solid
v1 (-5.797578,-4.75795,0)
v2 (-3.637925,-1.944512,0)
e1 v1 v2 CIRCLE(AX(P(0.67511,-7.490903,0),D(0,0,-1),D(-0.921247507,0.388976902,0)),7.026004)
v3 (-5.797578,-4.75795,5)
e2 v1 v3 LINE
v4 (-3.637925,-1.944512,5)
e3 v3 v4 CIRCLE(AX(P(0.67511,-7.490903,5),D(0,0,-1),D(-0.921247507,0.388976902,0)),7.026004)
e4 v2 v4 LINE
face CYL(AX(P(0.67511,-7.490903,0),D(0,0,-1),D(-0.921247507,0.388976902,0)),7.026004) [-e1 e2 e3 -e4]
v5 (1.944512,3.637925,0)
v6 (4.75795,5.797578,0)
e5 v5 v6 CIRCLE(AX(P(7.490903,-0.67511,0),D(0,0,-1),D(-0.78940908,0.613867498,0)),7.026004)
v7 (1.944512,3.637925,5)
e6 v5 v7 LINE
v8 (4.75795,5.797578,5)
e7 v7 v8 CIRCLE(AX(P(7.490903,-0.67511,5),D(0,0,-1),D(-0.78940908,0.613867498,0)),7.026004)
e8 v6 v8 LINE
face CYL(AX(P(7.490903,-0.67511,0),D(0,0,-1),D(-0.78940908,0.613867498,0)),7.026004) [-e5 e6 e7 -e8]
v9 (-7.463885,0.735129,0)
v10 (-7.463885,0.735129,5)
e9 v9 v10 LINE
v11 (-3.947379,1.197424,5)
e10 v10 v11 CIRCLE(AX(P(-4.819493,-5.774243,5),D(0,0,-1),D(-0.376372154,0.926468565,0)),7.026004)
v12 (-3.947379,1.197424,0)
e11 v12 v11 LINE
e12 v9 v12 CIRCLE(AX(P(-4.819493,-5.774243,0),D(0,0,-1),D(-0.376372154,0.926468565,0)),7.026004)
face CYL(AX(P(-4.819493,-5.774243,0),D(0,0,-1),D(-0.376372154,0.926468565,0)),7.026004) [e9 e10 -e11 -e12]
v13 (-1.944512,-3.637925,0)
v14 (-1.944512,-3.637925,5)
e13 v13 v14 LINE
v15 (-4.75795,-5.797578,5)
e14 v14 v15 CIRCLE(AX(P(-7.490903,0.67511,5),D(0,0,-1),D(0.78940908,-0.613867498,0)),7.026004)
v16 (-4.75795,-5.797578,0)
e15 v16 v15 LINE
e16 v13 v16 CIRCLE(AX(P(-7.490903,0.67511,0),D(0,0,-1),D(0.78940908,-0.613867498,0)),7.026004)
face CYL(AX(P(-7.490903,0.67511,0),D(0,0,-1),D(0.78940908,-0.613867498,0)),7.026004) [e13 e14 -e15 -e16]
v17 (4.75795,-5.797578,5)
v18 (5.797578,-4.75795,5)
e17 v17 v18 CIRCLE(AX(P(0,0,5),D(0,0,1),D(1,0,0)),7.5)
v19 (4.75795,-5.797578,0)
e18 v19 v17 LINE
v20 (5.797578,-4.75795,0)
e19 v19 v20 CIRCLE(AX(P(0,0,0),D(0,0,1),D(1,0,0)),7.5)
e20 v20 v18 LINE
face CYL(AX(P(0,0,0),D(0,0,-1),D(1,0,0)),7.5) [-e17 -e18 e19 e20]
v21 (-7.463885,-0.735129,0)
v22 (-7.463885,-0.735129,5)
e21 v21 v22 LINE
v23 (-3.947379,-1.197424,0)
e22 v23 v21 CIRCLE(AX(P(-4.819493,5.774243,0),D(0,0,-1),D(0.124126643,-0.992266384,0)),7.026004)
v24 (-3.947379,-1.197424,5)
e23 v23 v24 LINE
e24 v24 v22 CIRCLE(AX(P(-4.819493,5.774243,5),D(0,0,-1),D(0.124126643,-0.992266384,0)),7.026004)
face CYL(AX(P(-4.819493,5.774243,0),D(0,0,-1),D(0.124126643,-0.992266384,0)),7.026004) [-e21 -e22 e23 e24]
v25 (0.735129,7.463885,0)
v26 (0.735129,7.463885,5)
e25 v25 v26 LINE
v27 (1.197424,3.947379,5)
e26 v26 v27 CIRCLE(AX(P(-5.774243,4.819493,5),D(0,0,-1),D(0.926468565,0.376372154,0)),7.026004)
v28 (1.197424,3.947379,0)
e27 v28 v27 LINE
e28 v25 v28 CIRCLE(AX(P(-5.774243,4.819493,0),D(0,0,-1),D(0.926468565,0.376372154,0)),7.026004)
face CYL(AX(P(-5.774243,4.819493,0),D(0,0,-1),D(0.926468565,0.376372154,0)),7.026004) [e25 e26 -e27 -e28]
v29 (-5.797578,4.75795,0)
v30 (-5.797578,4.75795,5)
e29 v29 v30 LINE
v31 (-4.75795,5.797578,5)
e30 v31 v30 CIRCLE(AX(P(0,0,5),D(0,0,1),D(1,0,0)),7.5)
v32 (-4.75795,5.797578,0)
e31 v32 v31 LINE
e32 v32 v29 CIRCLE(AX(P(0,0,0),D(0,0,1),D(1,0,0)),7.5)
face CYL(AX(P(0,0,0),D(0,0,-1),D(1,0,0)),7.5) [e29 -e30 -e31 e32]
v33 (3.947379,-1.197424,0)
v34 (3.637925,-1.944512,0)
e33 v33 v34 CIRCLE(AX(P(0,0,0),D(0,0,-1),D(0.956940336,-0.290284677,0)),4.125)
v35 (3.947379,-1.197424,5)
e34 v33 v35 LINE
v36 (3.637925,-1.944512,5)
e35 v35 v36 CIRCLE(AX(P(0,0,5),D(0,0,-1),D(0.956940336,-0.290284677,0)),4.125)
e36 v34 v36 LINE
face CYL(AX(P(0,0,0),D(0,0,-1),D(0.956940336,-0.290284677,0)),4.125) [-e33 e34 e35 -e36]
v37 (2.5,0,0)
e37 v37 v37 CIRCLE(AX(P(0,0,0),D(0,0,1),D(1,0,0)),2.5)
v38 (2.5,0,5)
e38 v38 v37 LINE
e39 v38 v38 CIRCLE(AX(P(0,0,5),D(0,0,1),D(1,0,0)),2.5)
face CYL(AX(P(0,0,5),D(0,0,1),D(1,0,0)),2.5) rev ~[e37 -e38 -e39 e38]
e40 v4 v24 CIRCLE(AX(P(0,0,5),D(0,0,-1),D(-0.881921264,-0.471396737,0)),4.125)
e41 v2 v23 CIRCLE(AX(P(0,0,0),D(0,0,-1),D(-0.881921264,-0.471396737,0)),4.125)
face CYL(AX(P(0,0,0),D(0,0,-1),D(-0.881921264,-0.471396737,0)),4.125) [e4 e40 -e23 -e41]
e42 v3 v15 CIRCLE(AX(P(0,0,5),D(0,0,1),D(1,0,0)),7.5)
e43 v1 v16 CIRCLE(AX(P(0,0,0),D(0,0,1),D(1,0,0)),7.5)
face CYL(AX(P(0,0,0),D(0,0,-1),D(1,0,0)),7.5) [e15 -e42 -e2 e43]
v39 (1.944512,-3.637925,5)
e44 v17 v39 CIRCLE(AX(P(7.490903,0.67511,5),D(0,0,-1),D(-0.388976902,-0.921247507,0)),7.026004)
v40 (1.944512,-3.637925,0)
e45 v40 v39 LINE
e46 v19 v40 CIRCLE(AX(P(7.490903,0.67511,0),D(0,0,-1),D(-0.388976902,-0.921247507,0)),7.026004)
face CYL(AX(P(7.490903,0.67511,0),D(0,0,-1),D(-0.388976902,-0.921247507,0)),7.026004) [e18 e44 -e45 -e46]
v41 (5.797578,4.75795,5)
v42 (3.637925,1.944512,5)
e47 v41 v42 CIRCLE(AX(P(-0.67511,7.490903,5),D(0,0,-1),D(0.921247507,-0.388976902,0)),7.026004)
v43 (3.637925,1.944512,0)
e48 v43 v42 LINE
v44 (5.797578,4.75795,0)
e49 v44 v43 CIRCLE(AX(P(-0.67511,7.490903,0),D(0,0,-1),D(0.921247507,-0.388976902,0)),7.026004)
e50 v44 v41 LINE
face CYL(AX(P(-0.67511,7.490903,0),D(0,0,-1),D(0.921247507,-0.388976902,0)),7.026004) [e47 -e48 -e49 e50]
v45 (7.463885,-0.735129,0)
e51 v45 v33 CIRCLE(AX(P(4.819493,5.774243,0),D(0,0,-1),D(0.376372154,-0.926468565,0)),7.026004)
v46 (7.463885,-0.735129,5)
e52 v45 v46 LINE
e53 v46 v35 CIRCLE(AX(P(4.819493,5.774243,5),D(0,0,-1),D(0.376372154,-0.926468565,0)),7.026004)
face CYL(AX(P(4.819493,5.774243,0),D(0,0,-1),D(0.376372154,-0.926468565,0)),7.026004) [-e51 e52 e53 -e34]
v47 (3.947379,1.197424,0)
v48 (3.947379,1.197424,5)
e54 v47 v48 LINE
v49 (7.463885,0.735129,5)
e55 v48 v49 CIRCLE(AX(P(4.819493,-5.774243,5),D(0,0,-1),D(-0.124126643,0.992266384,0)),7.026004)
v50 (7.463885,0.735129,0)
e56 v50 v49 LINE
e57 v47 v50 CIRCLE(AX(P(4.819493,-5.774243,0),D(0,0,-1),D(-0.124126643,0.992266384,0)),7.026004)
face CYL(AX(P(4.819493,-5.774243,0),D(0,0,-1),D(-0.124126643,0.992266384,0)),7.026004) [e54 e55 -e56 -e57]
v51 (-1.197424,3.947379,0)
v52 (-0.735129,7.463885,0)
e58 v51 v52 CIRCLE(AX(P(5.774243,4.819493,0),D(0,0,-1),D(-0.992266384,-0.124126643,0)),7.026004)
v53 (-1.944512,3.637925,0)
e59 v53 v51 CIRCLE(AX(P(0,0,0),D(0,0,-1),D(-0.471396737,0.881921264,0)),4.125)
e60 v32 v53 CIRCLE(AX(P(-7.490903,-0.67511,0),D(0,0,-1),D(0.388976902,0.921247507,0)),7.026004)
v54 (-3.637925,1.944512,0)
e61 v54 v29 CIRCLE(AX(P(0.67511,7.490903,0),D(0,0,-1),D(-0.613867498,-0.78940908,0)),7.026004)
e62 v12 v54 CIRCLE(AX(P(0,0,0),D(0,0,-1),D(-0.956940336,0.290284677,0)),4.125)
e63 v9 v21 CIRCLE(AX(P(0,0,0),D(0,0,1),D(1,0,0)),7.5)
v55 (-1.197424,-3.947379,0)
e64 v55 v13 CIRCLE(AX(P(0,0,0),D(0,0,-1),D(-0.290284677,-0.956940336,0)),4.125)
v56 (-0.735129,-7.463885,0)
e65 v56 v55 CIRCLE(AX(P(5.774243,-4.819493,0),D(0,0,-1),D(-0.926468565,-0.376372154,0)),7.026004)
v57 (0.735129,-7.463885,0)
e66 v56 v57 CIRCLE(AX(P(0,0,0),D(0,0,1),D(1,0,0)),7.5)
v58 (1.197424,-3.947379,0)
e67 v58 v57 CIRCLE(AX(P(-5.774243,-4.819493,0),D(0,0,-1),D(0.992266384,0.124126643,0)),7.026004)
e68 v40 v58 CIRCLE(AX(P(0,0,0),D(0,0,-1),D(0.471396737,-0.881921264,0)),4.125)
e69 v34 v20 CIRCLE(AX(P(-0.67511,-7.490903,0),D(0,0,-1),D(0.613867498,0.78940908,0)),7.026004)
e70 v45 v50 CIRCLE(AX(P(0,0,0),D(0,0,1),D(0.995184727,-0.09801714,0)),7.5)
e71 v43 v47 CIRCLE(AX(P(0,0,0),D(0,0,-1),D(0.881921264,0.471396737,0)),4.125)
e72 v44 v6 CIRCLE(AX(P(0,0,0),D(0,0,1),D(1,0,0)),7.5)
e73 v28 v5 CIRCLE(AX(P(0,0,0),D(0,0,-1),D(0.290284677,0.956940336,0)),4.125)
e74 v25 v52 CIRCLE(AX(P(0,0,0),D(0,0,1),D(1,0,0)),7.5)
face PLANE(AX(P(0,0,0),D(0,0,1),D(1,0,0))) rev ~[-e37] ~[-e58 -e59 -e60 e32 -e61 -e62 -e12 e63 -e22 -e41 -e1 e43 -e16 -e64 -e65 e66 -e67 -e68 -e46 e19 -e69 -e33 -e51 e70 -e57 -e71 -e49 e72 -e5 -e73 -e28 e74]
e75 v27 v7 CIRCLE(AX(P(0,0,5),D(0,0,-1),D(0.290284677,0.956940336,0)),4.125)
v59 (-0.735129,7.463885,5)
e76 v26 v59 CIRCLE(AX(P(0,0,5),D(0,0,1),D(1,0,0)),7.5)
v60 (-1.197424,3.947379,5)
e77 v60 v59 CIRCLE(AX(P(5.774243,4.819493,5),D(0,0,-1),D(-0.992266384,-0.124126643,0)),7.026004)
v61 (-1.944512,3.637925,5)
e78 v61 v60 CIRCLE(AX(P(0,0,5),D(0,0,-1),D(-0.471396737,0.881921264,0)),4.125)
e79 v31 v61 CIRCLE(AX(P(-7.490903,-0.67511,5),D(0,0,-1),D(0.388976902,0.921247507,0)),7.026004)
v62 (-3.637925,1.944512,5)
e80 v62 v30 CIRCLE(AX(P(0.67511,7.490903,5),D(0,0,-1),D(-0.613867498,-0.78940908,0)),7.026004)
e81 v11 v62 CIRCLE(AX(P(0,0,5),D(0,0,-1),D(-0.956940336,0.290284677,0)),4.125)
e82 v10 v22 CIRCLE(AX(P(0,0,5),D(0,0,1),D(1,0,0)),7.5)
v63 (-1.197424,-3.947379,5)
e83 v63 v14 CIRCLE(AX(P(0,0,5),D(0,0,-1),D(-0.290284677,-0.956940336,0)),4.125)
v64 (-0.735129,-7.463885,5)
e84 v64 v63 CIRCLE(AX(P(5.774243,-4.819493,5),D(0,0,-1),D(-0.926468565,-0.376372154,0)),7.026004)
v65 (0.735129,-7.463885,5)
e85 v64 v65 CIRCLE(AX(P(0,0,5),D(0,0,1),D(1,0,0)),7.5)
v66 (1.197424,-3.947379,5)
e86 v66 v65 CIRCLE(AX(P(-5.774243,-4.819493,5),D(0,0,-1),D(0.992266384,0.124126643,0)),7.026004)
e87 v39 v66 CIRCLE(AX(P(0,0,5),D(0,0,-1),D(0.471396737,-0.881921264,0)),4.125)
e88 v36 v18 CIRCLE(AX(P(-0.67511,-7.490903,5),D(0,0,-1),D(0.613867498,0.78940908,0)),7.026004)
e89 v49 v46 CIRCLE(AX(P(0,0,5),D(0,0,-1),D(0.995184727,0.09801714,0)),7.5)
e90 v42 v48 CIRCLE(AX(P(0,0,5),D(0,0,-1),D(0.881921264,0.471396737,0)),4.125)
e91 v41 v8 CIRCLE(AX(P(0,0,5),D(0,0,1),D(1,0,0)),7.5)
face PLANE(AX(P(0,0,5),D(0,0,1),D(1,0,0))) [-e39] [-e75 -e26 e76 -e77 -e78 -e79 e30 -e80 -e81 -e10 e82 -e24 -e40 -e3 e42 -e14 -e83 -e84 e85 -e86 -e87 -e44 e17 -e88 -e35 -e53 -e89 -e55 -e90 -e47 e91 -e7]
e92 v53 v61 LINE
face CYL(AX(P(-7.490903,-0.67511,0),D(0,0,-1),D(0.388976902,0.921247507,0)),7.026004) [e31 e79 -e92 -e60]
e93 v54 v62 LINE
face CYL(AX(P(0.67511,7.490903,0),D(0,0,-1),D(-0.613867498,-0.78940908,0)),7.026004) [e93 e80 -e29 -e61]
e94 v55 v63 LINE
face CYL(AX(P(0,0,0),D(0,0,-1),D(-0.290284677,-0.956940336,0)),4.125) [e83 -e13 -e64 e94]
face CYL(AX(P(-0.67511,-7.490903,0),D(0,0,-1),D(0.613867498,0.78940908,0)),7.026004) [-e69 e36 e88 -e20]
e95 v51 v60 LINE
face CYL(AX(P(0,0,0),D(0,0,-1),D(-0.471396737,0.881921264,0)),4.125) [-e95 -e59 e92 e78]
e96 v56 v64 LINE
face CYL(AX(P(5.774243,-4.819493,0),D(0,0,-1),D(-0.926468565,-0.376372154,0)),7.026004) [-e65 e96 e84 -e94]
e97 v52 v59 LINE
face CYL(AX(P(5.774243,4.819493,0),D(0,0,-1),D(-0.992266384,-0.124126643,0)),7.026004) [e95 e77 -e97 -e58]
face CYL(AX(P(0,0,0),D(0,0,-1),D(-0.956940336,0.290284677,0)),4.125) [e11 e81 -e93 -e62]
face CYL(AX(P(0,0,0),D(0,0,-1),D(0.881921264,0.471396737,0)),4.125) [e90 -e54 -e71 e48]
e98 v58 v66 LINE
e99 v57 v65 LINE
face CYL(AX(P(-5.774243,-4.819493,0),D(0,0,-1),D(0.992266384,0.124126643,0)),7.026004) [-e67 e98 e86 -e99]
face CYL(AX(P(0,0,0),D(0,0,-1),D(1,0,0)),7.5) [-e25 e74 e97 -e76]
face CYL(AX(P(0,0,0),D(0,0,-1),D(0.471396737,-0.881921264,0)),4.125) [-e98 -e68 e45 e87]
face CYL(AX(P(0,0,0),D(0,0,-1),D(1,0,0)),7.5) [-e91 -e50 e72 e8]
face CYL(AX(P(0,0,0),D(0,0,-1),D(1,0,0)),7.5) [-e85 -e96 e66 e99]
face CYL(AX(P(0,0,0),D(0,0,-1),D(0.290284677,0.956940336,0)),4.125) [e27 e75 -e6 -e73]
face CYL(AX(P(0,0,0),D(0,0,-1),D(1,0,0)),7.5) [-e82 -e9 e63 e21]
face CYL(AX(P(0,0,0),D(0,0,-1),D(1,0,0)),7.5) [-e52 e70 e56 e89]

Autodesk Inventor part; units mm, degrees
sketch "Sketch1" plane through (0, 0, 0) normal (0, 0, 1) x (1, 0, 0)
  circle A0 centre (0, 0) radius 7.5
  dimension "d0" = 15
extrude "Extrusion1" add sketch "Sketch1" along normal blind 5
ref_plane "Work Plane2" through (0, 0, 2.5) normal (0, 0, 1) x (1, 0, 0)
sketch "Sketch2" plane through (0, 0, 0) normal (0, 0, -1) x (-1, 0, 0)
  circle A0 centre (0, 0) radius 7.5 projected
  circle A1 centre (0, 0) radius 6
  dimension "d3" = 12
surface extrude "Pitch Diameter" sketch "Sketch2" against normal through all shown no curves A1
ref_plane "Work Plane8" through (0, 0, 0) normal (0.9238795, 0.3826834, 0) x (0, 0, 1)
ref_plane "Work Plane9" through (0, 0, 0) normal (1, 0, 0) x (0, 1, 0)
spur gear teeth "Spur Gear" teeth 8 pitch diameter 12 tip diameter 15 root diameter 8.25 face width 5 start plane through (0, 0, 0) normal (0, 0, -1) x (-1, 0, 0)
sketch "Sketch3" plane through (0, 0, 5) normal (0, 0, 1) x (1, 0, 0)
  circle A0 centre (0, 0) radius 2.5
  dimension "d49" = 5
extrude "Extrusion2" cut sketch "Sketch3" against normal up to surface (5 mm away)
equation "\"d0\" = da_da"
equation "\"d1\" = da_b"
equation "\"d3\" = da_d"
equation "\"d16\" = da_aw"
equation "\"d43\" = da_aw"
equation "\"d46\" = da_aw"
equation "\"da_da\" = 15"
equation "\"da_b\" = 5"
equation "\"da_d\" = 12"
equation "\"da_aw\" = 13.5"
properties part number "Spur Gear1" material "Steel"
